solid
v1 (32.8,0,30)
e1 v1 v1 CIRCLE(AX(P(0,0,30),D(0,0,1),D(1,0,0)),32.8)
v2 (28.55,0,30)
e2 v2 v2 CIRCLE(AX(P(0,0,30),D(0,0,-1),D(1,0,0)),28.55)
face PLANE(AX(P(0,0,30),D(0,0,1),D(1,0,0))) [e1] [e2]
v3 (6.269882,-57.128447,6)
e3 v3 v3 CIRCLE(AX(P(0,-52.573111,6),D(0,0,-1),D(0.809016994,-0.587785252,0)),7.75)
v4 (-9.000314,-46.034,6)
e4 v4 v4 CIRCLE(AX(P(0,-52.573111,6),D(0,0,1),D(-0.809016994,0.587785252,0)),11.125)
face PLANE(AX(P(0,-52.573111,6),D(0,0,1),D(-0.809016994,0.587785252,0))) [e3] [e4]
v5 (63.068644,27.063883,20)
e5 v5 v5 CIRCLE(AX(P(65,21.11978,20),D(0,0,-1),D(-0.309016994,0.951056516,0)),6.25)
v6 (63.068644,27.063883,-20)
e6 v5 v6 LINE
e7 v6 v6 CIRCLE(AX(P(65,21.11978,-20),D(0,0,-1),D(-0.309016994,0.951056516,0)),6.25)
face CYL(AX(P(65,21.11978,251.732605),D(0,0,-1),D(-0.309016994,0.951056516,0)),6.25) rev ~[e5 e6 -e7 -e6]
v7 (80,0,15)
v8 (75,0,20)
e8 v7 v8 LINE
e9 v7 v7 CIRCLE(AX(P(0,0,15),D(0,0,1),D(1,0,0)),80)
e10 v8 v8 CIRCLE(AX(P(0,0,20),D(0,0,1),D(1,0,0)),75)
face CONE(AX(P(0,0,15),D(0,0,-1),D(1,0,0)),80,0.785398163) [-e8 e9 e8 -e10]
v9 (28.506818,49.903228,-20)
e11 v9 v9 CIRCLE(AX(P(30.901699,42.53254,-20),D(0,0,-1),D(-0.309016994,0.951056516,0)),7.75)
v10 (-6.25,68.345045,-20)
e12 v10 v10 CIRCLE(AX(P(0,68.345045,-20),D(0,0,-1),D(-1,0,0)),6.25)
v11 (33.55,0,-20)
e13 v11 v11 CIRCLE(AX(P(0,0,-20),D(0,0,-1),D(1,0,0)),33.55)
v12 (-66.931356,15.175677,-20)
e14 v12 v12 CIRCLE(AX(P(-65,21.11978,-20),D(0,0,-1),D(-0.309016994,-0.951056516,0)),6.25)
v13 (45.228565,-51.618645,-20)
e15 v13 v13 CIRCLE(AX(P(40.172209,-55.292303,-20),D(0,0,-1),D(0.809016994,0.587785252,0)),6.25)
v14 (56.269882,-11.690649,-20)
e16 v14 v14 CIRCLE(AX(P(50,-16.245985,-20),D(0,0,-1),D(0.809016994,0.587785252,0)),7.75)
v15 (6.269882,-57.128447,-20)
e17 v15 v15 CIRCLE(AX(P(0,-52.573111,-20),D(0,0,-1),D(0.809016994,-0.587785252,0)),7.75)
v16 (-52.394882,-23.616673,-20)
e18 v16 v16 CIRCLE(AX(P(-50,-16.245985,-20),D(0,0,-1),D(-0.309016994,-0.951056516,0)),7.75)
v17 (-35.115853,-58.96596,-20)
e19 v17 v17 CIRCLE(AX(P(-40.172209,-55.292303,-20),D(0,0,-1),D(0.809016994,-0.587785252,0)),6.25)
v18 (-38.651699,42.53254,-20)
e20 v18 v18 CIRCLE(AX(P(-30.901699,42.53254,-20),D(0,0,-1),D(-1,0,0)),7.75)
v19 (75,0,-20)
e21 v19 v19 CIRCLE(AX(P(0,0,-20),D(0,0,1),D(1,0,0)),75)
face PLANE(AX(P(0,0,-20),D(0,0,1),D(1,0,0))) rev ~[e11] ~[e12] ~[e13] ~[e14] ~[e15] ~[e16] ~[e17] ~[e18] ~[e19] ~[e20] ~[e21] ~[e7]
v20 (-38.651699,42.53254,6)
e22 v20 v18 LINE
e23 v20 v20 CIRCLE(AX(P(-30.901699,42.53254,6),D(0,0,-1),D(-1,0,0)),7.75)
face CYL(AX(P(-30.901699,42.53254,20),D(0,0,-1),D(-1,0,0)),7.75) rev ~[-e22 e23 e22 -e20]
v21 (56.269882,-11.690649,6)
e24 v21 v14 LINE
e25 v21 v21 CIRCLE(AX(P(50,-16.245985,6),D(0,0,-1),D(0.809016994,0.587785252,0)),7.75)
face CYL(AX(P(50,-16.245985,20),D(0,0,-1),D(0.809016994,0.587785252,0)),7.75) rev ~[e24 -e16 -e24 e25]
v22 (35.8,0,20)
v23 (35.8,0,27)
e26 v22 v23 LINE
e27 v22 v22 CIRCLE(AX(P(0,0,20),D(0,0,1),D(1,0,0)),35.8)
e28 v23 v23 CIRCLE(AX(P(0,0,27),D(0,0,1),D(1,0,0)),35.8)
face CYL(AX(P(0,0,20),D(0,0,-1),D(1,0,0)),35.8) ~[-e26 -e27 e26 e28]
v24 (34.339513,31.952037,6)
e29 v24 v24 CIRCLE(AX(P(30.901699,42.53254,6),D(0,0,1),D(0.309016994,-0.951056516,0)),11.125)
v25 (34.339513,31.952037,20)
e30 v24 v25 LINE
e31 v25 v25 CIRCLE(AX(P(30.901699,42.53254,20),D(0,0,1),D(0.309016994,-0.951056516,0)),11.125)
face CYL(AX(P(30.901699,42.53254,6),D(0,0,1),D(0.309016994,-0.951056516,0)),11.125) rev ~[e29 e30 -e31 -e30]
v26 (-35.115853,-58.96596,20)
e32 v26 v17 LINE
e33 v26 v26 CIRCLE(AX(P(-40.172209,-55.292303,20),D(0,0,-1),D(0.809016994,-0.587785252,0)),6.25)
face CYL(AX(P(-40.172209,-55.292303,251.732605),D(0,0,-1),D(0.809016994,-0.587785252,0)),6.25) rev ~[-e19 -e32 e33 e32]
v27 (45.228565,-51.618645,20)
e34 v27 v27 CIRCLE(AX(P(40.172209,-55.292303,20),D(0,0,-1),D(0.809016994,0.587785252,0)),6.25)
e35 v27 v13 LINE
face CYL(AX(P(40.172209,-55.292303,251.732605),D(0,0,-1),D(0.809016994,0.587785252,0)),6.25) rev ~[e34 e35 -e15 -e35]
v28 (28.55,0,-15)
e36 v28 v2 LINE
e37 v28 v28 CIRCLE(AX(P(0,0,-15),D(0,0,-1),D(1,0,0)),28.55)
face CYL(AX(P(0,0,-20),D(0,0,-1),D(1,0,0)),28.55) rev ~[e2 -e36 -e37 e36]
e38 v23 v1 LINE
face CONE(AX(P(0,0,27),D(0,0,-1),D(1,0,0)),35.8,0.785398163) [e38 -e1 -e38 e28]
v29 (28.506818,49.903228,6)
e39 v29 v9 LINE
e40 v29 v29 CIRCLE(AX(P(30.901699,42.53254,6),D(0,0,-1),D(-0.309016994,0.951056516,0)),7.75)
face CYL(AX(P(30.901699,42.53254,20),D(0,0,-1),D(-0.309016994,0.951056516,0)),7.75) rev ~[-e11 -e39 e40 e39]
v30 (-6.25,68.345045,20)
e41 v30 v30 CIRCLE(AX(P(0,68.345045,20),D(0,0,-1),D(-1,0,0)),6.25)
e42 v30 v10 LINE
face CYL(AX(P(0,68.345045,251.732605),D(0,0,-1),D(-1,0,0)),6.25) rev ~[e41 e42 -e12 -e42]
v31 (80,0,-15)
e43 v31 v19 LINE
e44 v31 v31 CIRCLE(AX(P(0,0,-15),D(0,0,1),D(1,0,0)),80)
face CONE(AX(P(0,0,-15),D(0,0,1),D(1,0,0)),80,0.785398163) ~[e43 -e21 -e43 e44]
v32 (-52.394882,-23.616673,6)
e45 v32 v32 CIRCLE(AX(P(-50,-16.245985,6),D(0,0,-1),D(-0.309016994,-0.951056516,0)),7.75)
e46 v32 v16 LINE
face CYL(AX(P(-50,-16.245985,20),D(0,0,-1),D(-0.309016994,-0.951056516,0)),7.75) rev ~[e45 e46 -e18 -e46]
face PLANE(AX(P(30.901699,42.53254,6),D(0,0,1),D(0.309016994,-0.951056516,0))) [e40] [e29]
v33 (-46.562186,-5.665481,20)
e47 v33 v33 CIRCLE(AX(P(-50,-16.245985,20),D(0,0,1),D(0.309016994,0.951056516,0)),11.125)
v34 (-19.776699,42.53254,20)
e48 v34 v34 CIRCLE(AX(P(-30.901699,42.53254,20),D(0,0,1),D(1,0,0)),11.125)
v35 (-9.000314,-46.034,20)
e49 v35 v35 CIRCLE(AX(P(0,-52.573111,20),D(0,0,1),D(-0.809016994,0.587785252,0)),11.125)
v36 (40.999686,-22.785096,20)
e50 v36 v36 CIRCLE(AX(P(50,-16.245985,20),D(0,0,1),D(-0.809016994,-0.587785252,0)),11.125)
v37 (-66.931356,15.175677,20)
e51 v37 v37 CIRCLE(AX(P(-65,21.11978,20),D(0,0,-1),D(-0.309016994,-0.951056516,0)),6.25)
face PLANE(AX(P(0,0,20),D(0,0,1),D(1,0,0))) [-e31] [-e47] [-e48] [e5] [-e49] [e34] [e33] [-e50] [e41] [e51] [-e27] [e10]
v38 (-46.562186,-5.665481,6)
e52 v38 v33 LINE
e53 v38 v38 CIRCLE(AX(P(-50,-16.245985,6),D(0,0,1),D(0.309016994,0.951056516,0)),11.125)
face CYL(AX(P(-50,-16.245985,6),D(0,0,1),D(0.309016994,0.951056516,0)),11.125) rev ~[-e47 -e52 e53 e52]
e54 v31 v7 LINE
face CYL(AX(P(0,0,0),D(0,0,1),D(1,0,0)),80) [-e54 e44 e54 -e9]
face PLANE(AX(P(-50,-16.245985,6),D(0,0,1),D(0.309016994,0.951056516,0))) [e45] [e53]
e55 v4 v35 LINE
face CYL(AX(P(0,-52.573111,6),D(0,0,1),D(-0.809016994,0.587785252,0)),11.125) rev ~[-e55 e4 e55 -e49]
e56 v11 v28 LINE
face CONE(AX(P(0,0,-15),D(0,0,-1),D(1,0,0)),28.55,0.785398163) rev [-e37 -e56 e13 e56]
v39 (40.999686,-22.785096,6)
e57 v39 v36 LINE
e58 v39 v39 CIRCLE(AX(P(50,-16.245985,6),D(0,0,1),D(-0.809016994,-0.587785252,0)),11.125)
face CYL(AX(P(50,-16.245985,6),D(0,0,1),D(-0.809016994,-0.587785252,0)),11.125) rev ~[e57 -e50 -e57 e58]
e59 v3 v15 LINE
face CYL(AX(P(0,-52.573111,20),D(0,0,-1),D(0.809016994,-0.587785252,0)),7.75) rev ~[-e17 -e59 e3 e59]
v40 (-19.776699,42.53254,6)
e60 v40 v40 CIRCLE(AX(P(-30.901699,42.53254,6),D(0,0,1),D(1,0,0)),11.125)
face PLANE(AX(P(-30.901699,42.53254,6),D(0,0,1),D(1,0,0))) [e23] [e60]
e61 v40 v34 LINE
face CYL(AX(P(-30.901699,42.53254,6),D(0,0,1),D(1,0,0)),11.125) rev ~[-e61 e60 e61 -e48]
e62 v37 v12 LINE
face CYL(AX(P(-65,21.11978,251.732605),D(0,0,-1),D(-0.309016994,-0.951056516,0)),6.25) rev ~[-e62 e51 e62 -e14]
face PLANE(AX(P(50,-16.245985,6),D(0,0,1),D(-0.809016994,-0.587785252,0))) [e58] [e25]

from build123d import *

# Parameters (mm, degrees)
F0_R             = 80
F1_DEPTH         = 20
F2_R             = 35.8
F3_DEPTH         = 10
F6_R             = 28.55
F7_DEPTH         = 50.001
F9_D             = 15.5
F9_CBORE_D       = 22.25
F9_CBORE_DEPTH   = 14
F9_COPIES_COUNT  = 5
F10_D            = 12.5
F10_COPIES_COUNT = 5
F11_SIZE         = 5
F12_SIZE         = 3


# Not quite as in the source:
# - a pattern or mirror of a feature is missing from the dataset's text; its kind, count and spacing are read off the source's solid
# - the program builds the solid bodies; features that only make, move or delete a surface that nothing else refers to are left out


with BuildPart() as f1:
    # F0 (on Top) → F1 (new body, symmetric)
    with BuildSketch(Plane.XY):
        Circle(F0_R)
    extrude(amount=F1_DEPTH, both=True)

    # F2 (on face) → F3 (join)
    with BuildSketch(Plane.XY.offset(20)):
        Circle(F2_R)
    extrude(amount=F3_DEPTH)

    # F6 (on face) → F7 (cut, through all)
    with BuildSketch(Plane(origin=(0, 0, -20), x_dir=(1, 0, 0), z_dir=(0, 0, -1))):
        Circle(F6_R)
    extrude(amount=-F7_DEPTH, mode=Mode.SUBTRACT)

    # F9 (through all)
    with Locations(Plane.XY.offset(20)):
        with Locations((-30.9016994375, 42.5325404176)):
            f9 = CounterBoreHole(F9_D / 2, F9_CBORE_D / 2, F9_CBORE_DEPTH)

    # F9_copies: F9 ×5 about axis
    f9_copies_axis = Axis((0, 0, 0), (0, 0, 1))
    for i in range(1, F9_COPIES_COUNT):
        add(f9.rotate(f9_copies_axis, i * 360 / F9_COPIES_COUNT), mode=Mode.SUBTRACT)

    # F10 (through all)
    with Locations(Plane.XY.offset(20)):
        with Locations((0, 68.3450445755)):
            f10 = Hole(F10_D / 2)

    # F10_copies: F10 ×5 about axis
    f10_copies_axis = Axis((0, 0, 0), (0, 0, 1))
    for i in range(1, F10_COPIES_COUNT):
        add(f10.rotate(f10_copies_axis, i * 360 / F10_COPIES_COUNT), mode=Mode.SUBTRACT)

    # F11
    f11_edges = [f1.edges().sort_by_distance(p)[0] for p in [
        (-80, 0, 20),
        (-28.55, 0, -20),
        (-80, 0, -20),
    ]]
    chamfer(f11_edges, length=F11_SIZE)

    # F12
    f12_edges = [f1.edges().sort_by_distance(p)[0] for p in [
        (-35.8, 0, 30),
    ]]
    chamfer(f12_edges, length=F12_SIZE)


solid = f1.part
